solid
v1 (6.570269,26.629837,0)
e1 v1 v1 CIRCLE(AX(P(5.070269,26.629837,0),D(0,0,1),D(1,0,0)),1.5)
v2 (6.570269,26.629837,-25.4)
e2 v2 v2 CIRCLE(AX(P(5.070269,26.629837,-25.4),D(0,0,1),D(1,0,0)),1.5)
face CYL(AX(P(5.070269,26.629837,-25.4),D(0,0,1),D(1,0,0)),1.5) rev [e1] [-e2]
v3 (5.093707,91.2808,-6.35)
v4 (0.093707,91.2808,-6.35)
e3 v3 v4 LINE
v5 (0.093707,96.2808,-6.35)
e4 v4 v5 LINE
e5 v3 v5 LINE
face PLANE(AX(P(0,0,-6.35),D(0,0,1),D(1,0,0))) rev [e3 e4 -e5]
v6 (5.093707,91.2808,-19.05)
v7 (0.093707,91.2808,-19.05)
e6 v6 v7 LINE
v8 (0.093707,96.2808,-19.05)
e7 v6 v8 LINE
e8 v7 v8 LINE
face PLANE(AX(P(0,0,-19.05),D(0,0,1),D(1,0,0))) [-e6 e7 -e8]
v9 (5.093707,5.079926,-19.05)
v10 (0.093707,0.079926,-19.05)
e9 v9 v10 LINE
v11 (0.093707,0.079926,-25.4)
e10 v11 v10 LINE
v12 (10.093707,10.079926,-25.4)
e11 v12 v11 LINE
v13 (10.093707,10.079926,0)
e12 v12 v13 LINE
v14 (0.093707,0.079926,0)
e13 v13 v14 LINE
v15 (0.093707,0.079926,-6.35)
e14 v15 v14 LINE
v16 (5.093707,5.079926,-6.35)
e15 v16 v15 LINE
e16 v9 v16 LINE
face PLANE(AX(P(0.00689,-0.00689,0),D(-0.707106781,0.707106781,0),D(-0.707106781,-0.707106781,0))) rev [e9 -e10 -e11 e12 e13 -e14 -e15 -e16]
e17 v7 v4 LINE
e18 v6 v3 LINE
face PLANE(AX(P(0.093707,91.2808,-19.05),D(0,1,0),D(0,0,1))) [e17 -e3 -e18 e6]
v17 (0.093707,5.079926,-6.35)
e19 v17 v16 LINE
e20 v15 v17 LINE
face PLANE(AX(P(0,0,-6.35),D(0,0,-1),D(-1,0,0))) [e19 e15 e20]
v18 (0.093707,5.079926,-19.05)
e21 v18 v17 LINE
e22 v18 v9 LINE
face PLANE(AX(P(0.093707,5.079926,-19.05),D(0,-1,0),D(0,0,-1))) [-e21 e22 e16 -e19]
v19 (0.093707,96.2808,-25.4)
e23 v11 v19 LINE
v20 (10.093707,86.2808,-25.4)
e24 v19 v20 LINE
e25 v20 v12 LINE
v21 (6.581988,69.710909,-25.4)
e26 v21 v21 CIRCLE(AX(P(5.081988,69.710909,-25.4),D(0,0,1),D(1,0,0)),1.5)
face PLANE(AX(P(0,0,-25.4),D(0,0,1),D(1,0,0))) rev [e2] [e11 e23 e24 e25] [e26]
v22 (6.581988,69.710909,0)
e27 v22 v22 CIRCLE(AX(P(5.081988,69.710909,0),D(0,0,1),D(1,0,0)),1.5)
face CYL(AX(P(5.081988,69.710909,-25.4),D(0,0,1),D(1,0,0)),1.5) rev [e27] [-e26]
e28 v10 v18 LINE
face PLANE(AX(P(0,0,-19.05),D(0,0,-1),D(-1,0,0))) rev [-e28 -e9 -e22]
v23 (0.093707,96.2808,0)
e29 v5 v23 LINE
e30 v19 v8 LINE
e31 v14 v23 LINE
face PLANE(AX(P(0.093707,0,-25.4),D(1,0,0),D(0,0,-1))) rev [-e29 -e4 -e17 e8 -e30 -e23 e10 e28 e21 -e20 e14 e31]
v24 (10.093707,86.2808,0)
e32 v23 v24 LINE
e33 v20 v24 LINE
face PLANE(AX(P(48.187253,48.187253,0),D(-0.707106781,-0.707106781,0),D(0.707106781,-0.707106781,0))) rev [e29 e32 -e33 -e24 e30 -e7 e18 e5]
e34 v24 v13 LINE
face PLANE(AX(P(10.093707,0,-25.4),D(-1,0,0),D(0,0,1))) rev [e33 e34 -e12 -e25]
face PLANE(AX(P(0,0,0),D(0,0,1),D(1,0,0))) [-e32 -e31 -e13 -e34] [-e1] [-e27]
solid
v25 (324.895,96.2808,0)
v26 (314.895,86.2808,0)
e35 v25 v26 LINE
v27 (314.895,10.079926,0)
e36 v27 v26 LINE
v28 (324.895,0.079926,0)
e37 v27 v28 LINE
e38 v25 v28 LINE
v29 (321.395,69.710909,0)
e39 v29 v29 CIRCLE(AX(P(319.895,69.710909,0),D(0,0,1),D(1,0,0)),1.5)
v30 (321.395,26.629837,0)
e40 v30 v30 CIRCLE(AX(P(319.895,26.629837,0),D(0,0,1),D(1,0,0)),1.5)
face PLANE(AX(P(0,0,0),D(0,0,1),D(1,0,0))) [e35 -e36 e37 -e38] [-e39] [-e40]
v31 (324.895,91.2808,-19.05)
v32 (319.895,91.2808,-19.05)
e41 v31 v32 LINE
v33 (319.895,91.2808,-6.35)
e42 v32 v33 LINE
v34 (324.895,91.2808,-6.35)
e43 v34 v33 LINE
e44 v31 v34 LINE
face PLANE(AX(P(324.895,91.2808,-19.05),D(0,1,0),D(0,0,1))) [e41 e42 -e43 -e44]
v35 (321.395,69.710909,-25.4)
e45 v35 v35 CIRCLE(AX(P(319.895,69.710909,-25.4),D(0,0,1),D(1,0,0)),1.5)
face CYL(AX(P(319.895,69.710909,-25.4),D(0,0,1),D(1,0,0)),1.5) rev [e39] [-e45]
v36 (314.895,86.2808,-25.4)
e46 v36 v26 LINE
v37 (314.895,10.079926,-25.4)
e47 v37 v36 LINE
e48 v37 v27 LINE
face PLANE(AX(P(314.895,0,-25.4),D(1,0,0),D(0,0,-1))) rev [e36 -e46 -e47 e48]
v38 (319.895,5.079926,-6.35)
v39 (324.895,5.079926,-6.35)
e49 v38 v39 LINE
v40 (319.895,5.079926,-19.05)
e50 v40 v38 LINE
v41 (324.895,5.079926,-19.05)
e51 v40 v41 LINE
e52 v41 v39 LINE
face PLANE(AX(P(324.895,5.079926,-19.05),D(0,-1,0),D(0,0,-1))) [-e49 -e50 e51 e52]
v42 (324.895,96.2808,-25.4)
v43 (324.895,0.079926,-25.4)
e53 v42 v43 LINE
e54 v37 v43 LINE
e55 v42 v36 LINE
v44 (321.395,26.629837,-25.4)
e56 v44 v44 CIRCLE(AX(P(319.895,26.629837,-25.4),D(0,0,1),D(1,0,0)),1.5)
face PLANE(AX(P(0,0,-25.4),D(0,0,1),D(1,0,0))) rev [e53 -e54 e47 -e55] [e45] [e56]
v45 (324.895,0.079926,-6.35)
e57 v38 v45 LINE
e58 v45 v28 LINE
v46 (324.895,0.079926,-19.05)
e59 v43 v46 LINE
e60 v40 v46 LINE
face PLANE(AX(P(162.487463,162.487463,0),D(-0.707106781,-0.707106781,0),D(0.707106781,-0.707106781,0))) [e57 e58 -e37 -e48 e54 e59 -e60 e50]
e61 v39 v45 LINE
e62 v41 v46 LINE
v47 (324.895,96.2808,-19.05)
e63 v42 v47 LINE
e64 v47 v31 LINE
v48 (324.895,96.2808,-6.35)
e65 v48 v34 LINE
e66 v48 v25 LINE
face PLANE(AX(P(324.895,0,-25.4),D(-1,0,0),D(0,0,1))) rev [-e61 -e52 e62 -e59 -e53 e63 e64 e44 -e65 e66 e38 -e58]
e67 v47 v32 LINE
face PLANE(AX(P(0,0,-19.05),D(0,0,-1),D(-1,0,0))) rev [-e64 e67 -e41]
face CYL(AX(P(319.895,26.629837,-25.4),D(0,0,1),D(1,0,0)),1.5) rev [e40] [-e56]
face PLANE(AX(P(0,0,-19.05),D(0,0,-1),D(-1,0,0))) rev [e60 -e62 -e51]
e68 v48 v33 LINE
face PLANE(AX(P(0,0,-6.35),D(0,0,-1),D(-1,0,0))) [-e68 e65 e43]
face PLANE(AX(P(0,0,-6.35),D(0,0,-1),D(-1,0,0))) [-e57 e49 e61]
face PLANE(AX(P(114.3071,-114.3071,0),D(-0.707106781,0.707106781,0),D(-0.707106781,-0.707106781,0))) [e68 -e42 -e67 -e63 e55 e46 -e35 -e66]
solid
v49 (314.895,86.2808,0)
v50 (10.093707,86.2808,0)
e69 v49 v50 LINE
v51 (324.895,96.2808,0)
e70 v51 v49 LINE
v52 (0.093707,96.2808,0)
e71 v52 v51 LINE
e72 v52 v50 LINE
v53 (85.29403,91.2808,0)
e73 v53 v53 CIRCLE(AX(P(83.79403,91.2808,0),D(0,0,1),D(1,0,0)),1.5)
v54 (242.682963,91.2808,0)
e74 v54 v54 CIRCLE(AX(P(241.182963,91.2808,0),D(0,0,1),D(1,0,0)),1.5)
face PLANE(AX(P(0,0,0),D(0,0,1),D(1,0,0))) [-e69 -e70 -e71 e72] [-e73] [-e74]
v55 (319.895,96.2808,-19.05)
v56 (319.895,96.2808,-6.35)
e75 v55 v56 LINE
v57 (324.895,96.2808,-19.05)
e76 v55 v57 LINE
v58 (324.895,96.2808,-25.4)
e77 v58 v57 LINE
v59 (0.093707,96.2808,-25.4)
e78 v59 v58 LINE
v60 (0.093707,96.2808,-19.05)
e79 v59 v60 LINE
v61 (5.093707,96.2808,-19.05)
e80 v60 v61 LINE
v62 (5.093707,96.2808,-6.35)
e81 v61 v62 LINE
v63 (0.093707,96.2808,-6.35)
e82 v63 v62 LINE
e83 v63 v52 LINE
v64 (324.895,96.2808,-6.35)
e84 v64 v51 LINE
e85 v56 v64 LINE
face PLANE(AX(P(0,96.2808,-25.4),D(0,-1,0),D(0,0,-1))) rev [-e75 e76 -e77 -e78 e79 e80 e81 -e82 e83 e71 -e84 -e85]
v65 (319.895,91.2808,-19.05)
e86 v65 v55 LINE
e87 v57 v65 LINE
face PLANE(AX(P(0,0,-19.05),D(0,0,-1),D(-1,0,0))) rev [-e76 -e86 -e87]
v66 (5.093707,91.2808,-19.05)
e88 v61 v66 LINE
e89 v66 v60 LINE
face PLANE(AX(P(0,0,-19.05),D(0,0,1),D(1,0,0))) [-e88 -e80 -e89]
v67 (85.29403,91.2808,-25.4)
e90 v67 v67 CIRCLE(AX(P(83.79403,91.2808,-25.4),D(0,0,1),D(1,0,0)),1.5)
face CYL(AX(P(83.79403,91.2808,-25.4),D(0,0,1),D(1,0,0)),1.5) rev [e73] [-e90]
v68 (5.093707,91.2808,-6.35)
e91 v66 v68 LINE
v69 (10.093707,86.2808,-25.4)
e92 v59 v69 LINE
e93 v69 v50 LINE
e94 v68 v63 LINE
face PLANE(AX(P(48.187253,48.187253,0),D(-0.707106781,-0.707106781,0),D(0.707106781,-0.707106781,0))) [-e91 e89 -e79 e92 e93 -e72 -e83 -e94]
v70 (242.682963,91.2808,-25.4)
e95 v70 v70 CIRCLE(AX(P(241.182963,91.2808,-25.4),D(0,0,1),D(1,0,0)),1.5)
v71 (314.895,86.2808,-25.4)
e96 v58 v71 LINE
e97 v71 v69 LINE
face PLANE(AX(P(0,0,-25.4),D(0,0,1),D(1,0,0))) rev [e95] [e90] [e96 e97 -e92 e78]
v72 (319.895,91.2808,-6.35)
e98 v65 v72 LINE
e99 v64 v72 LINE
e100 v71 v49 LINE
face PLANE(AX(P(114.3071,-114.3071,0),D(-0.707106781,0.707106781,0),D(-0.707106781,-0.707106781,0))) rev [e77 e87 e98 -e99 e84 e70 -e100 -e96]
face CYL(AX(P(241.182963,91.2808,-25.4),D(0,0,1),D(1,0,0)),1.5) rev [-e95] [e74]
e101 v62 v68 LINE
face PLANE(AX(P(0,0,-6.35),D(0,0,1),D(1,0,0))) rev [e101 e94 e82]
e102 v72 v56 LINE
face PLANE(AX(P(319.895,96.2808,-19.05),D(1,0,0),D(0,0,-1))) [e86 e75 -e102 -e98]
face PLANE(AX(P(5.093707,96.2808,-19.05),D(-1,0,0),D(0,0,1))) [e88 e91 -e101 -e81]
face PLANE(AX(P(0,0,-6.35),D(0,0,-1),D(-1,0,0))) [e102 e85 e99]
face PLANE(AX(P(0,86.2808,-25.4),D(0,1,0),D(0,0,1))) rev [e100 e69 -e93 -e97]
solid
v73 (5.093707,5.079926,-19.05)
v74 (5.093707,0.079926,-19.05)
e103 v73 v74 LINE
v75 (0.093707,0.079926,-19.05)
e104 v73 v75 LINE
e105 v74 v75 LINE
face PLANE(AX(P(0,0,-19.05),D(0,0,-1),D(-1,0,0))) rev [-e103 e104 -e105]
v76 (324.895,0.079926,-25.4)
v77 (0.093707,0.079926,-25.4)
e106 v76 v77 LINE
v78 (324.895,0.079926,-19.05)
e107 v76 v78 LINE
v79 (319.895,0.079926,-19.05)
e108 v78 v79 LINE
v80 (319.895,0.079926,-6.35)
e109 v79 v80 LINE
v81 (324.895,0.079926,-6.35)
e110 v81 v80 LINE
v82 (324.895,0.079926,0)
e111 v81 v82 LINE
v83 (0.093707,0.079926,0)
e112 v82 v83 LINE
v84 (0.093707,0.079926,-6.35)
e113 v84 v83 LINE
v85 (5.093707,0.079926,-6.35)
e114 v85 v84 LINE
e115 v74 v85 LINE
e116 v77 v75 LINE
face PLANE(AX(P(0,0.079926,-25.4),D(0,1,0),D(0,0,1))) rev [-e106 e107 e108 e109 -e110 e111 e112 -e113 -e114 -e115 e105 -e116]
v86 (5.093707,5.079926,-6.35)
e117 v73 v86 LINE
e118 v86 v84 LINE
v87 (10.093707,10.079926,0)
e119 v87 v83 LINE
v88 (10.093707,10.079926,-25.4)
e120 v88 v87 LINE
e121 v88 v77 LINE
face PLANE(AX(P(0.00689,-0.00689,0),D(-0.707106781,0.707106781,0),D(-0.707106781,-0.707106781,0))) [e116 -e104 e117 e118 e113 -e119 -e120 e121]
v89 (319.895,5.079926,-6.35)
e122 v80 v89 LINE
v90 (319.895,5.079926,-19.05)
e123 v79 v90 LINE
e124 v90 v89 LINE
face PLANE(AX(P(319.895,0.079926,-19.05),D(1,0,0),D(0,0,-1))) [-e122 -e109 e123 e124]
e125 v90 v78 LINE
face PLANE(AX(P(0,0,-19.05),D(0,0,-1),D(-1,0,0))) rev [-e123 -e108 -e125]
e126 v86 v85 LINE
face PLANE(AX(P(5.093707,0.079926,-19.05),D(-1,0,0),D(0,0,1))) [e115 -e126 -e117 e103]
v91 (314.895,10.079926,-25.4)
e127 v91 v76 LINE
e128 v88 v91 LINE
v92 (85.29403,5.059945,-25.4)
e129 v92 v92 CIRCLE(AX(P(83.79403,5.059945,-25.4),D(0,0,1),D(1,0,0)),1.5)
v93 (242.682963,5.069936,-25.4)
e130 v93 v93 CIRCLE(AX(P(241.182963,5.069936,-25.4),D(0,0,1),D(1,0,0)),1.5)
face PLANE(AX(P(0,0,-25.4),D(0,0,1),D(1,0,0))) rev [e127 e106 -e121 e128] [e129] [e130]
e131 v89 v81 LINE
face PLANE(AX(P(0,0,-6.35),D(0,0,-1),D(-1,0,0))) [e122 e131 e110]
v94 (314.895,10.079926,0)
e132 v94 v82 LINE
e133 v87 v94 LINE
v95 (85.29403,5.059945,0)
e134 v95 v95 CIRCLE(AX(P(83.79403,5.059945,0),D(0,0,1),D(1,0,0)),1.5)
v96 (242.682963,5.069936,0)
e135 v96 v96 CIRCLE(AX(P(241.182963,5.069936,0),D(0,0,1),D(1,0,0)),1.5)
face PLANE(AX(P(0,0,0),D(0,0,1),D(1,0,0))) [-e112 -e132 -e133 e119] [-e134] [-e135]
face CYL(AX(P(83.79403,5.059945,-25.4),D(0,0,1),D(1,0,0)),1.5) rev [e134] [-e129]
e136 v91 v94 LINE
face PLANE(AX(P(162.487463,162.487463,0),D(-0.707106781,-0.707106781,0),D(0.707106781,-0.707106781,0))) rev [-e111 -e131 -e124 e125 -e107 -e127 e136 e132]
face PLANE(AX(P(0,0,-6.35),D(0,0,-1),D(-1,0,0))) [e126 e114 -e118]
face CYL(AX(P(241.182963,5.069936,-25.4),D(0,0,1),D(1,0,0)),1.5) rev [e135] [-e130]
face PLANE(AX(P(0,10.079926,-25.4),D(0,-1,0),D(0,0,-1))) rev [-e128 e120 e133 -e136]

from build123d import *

# Parameters (mm, degrees)
SKETCH1_W               = 324.8012934
SKETCH1_H               = 96.2008736
SKETCH1_W_2             = 304.8012934
SKETCH1_H_2             = 76.2008736
BOSS_EXTRUDE1_DEPTH     = 25.4
SKETCH2_R               = 1.5
CUT_EXTRUDE1_DEPTH      = 25.4
SPLIT1_START            = -1
SPLIT1_OUTLINE_W        = 231.654651096
SPLIT1_OUTLINE_H        = 25.4
SPLIT1_DEPTH            = 300
SPLIT1_START_2          = 122.296599373
SPLIT1_2_OUTLINE_W      = 69.345348904
SPLIT1_2_OUTLINE_H      = 25.4
SPLIT1_2_DEPTH          = 107.4953748
SPLIT1_START_3          = -25.4
SPLIT1_3_OUTLINE_R      = 1.5
SPLIT1_3_DEPTH          = 25.4
SPLIT1_4_OUTLINE_R      = 1.5
SPLIT1_4_DEPTH          = 25.4
SPLIT1_5_DEPTH          = 25.4
SPLIT1_6_OUTLINE_R      = 1.5
SPLIT1_6_DEPTH          = 25.4
SPLIT1_7_OUTLINE_R      = 1.5
SPLIT1_7_DEPTH          = 25.4
SPLIT1_8_DEPTH          = 25.4
SPLIT1_9_OUTLINE_R      = 1.5
SPLIT1_9_DEPTH          = 25.4
CUT_EXTRUDE2_DEPTH      = 6.35
CUT_EXTRUDE2_DEPTH_BACK = 6.35
SKETCH5_W               = 5
SKETCH5_H               = 5


with BuildPart() as part:
    # Sketch1 → Boss-Extrude1 (new body)
    with BuildSketch(Plane.XY):
        with Locations((162.4943533, 48.1803632)):
            Rectangle(SKETCH1_W, SKETCH1_H)
        with Locations((162.4943533, 48.1803632)):
            Rectangle(SKETCH1_W_2, SKETCH1_H_2, mode=Mode.SUBTRACT)
    extrude(amount=-BOSS_EXTRUDE1_DEPTH)

    # Sketch2 → Cut-Extrude1 (cut)
    with BuildSketch(Plane.XY):
        with Locations((83.79402995, 91.2808)):
            Circle(SKETCH2_R)
        with Locations((241.182963325, 91.2808)):
            Circle(SKETCH2_R)
        with Locations((319.895, 69.710908993)):
            Circle(SKETCH2_R)
        with Locations((319.895, 26.629837247)):
            Circle(SKETCH2_R)
        with Locations((241.182963325, 5.0699356)):
            Circle(SKETCH2_R)
        with Locations((83.79402995, 5.0599448)):
            Circle(SKETCH2_R)
        with Locations((5.07026943, 26.629837247)):
            Circle(SKETCH2_R)
        with Locations((5.081988015, 69.710908993)):
            Circle(SKETCH2_R)
    extrude(amount=-CUT_EXTRUDE1_DEPTH, mode=Mode.SUBTRACT)

    # Split1: read off the stored shape, not the designer's step
    # Split1 outline → Split1 (cut)
    with BuildSketch(Plane(origin=(0, 0, 0), x_dir=(0.707106781186548, -0.707106781186547, 0), z_dir=(0.707106781186547, 0.707106781186548, 0)).offset(SPLIT1_START)):
        with Locations((45.827325548, 12.7)):
            Rectangle(SPLIT1_OUTLINE_W, SPLIT1_OUTLINE_H)
    extrude(amount=SPLIT1_DEPTH, mode=Mode.SUBTRACT)

    # Split1 2 outline → Split1 2 (cut)
    with BuildSketch(Plane(origin=(0, 0, 0), x_dir=(0.707106781186548, -0.707106781186547, 0), z_dir=(0.707106781186547, 0.707106781186548, 0)).offset(SPLIT1_START_2)):
        with Locations((196.327325548, 12.7)):
            Rectangle(SPLIT1_2_OUTLINE_W, SPLIT1_2_OUTLINE_H)
    extrude(amount=SPLIT1_2_DEPTH, mode=Mode.SUBTRACT)


with BuildPart() as body_2:
    # Split1 3 outline → Split1 3 (new body)
    with BuildSketch(Plane.XY.offset(SPLIT1_START_3)):
        Polygon((0.0937066, 0.0799264), (10.0937066, 10.0799264), (10.0937066, 86.2808), (0.0937066, 96.2808), align=None)
        with Locations((5.07026943, 26.629837247)):
            Circle(SPLIT1_3_OUTLINE_R, mode=Mode.SUBTRACT)
        with Locations((5.081988015, 69.710908993)):
            Circle(SPLIT1_3_OUTLINE_R, mode=Mode.SUBTRACT)
    extrude(amount=SPLIT1_3_DEPTH)


with BuildPart() as body_3:
    # Split1 4 outline → Split1 4 (new body)
    with BuildSketch(Plane.XY.offset(SPLIT1_START_3)):
        Polygon((324.895, 0.0799264), (314.895, 10.0799264), (238.6941264, 10.0799264), (228.6941264, 0.0799264), align=None)
        with Locations((241.182963325, 5.0699356)):
            Circle(SPLIT1_4_OUTLINE_R, mode=Mode.SUBTRACT)
    extrude(amount=SPLIT1_4_DEPTH)


with BuildPart() as body_4:
    # Split1 5 outline → Split1 5 (new body)
    with BuildSketch(Plane.XY.offset(SPLIT1_START_3)):
        Polygon((228.6941264, 0.0799264), (238.6941264, 10.0799264), (86.2945802, 10.0799264), (96.2945802, 0.0799264), align=None)
    extrude(amount=SPLIT1_5_DEPTH)


with BuildPart() as body_5:
    # Split1 6 outline → Split1 6 (new body)
    with BuildSketch(Plane.XY.offset(SPLIT1_START_3)):
        Polygon((96.2945802, 0.0799264), (86.2945802, 10.0799264), (10.0937066, 10.0799264), (0.0937066, 0.0799264), align=None)
        with Locations((83.79402995, 5.0599448)):
            Circle(SPLIT1_6_OUTLINE_R, mode=Mode.SUBTRACT)
    extrude(amount=SPLIT1_6_DEPTH)


with BuildPart() as body_6:
    # Split1 7 outline → Split1 7 (new body)
    with BuildSketch(Plane.XY.offset(SPLIT1_START_3)):
        Polygon((314.895, 86.2808), (324.895, 96.2808), (228.6941264, 96.2808), (238.6941264, 86.2808), align=None)
        with Locations((241.182963325, 91.2808)):
            Circle(SPLIT1_7_OUTLINE_R, mode=Mode.SUBTRACT)
    extrude(amount=SPLIT1_7_DEPTH)


with BuildPart() as body_7:
    # Split1 8 outline → Split1 8 (new body)
    with BuildSketch(Plane.XY.offset(SPLIT1_START_3)):
        Polygon((238.6941264, 86.2808), (228.6941264, 96.2808), (96.2945802, 96.2808), (86.2945802, 86.2808), align=None)
    extrude(amount=SPLIT1_8_DEPTH)


with BuildPart() as body_8:
    # Split1 9 outline → Split1 9 (new body)
    with BuildSketch(Plane.XY.offset(SPLIT1_START_3)):
        Polygon((86.2945802, 86.2808), (96.2945802, 96.2808), (0.0937066, 96.2808), (10.0937066, 86.2808), align=None)
        with Locations((83.79402995, 91.2808)):
            Circle(SPLIT1_9_OUTLINE_R, mode=Mode.SUBTRACT)
    extrude(amount=SPLIT1_9_DEPTH)

    # Combine1: union body 7, body 6
    add(body_7.part)
    add(body_6.part)


with BuildPart() as body_4_1:
    add(body_4.part)

    # Combine2: read off the stored shape, not the designer's step
    # Combine2: union body 3, body 5
    add(body_3.part)
    add(body_5.part)


with BuildPart() as cut_extrude2_tool:
    # Sketch5 → Cut-Extrude2 (new, two sides: drawn at the far end of the back side and taken through both)
    with BuildSketch(Plane.YX.offset(12.7).offset(-CUT_EXTRUDE2_DEPTH_BACK)):
        with Locations((2.5799264, 322.395)):
            Rectangle(SKETCH5_W, SKETCH5_H)
        with Locations((2.5799264, 2.5937066)):
            Rectangle(SKETCH5_W, SKETCH5_H)
        with Locations((93.7808, 2.5937066)):
            Rectangle(SKETCH5_W, SKETCH5_H)
        with Locations((93.7808, 322.395)):
            Rectangle(SKETCH5_W, SKETCH5_H)
    extrude(amount=CUT_EXTRUDE2_DEPTH + CUT_EXTRUDE2_DEPTH_BACK)


with BuildPart() as part_1:
    add(part.part)

    # Cut-Extrude2: cut by cut_extrude2_tool
    add(cut_extrude2_tool.part, mode=Mode.SUBTRACT)


with BuildPart() as body_2_1:
    add(body_2.part)

    # Cut-Extrude2: cut by cut_extrude2_tool
    add(cut_extrude2_tool.part, mode=Mode.SUBTRACT)


with BuildPart() as body_4_2:
    add(body_4_1.part)

    # Cut-Extrude2: cut by cut_extrude2_tool
    add(cut_extrude2_tool.part, mode=Mode.SUBTRACT)


with BuildPart() as body_8_1:
    add(body_8.part)

    # Cut-Extrude2: cut by cut_extrude2_tool
    add(cut_extrude2_tool.part, mode=Mode.SUBTRACT)


solid = Compound([part_1.part, body_2_1.part, body_4_2.part, body_8_1.part])
